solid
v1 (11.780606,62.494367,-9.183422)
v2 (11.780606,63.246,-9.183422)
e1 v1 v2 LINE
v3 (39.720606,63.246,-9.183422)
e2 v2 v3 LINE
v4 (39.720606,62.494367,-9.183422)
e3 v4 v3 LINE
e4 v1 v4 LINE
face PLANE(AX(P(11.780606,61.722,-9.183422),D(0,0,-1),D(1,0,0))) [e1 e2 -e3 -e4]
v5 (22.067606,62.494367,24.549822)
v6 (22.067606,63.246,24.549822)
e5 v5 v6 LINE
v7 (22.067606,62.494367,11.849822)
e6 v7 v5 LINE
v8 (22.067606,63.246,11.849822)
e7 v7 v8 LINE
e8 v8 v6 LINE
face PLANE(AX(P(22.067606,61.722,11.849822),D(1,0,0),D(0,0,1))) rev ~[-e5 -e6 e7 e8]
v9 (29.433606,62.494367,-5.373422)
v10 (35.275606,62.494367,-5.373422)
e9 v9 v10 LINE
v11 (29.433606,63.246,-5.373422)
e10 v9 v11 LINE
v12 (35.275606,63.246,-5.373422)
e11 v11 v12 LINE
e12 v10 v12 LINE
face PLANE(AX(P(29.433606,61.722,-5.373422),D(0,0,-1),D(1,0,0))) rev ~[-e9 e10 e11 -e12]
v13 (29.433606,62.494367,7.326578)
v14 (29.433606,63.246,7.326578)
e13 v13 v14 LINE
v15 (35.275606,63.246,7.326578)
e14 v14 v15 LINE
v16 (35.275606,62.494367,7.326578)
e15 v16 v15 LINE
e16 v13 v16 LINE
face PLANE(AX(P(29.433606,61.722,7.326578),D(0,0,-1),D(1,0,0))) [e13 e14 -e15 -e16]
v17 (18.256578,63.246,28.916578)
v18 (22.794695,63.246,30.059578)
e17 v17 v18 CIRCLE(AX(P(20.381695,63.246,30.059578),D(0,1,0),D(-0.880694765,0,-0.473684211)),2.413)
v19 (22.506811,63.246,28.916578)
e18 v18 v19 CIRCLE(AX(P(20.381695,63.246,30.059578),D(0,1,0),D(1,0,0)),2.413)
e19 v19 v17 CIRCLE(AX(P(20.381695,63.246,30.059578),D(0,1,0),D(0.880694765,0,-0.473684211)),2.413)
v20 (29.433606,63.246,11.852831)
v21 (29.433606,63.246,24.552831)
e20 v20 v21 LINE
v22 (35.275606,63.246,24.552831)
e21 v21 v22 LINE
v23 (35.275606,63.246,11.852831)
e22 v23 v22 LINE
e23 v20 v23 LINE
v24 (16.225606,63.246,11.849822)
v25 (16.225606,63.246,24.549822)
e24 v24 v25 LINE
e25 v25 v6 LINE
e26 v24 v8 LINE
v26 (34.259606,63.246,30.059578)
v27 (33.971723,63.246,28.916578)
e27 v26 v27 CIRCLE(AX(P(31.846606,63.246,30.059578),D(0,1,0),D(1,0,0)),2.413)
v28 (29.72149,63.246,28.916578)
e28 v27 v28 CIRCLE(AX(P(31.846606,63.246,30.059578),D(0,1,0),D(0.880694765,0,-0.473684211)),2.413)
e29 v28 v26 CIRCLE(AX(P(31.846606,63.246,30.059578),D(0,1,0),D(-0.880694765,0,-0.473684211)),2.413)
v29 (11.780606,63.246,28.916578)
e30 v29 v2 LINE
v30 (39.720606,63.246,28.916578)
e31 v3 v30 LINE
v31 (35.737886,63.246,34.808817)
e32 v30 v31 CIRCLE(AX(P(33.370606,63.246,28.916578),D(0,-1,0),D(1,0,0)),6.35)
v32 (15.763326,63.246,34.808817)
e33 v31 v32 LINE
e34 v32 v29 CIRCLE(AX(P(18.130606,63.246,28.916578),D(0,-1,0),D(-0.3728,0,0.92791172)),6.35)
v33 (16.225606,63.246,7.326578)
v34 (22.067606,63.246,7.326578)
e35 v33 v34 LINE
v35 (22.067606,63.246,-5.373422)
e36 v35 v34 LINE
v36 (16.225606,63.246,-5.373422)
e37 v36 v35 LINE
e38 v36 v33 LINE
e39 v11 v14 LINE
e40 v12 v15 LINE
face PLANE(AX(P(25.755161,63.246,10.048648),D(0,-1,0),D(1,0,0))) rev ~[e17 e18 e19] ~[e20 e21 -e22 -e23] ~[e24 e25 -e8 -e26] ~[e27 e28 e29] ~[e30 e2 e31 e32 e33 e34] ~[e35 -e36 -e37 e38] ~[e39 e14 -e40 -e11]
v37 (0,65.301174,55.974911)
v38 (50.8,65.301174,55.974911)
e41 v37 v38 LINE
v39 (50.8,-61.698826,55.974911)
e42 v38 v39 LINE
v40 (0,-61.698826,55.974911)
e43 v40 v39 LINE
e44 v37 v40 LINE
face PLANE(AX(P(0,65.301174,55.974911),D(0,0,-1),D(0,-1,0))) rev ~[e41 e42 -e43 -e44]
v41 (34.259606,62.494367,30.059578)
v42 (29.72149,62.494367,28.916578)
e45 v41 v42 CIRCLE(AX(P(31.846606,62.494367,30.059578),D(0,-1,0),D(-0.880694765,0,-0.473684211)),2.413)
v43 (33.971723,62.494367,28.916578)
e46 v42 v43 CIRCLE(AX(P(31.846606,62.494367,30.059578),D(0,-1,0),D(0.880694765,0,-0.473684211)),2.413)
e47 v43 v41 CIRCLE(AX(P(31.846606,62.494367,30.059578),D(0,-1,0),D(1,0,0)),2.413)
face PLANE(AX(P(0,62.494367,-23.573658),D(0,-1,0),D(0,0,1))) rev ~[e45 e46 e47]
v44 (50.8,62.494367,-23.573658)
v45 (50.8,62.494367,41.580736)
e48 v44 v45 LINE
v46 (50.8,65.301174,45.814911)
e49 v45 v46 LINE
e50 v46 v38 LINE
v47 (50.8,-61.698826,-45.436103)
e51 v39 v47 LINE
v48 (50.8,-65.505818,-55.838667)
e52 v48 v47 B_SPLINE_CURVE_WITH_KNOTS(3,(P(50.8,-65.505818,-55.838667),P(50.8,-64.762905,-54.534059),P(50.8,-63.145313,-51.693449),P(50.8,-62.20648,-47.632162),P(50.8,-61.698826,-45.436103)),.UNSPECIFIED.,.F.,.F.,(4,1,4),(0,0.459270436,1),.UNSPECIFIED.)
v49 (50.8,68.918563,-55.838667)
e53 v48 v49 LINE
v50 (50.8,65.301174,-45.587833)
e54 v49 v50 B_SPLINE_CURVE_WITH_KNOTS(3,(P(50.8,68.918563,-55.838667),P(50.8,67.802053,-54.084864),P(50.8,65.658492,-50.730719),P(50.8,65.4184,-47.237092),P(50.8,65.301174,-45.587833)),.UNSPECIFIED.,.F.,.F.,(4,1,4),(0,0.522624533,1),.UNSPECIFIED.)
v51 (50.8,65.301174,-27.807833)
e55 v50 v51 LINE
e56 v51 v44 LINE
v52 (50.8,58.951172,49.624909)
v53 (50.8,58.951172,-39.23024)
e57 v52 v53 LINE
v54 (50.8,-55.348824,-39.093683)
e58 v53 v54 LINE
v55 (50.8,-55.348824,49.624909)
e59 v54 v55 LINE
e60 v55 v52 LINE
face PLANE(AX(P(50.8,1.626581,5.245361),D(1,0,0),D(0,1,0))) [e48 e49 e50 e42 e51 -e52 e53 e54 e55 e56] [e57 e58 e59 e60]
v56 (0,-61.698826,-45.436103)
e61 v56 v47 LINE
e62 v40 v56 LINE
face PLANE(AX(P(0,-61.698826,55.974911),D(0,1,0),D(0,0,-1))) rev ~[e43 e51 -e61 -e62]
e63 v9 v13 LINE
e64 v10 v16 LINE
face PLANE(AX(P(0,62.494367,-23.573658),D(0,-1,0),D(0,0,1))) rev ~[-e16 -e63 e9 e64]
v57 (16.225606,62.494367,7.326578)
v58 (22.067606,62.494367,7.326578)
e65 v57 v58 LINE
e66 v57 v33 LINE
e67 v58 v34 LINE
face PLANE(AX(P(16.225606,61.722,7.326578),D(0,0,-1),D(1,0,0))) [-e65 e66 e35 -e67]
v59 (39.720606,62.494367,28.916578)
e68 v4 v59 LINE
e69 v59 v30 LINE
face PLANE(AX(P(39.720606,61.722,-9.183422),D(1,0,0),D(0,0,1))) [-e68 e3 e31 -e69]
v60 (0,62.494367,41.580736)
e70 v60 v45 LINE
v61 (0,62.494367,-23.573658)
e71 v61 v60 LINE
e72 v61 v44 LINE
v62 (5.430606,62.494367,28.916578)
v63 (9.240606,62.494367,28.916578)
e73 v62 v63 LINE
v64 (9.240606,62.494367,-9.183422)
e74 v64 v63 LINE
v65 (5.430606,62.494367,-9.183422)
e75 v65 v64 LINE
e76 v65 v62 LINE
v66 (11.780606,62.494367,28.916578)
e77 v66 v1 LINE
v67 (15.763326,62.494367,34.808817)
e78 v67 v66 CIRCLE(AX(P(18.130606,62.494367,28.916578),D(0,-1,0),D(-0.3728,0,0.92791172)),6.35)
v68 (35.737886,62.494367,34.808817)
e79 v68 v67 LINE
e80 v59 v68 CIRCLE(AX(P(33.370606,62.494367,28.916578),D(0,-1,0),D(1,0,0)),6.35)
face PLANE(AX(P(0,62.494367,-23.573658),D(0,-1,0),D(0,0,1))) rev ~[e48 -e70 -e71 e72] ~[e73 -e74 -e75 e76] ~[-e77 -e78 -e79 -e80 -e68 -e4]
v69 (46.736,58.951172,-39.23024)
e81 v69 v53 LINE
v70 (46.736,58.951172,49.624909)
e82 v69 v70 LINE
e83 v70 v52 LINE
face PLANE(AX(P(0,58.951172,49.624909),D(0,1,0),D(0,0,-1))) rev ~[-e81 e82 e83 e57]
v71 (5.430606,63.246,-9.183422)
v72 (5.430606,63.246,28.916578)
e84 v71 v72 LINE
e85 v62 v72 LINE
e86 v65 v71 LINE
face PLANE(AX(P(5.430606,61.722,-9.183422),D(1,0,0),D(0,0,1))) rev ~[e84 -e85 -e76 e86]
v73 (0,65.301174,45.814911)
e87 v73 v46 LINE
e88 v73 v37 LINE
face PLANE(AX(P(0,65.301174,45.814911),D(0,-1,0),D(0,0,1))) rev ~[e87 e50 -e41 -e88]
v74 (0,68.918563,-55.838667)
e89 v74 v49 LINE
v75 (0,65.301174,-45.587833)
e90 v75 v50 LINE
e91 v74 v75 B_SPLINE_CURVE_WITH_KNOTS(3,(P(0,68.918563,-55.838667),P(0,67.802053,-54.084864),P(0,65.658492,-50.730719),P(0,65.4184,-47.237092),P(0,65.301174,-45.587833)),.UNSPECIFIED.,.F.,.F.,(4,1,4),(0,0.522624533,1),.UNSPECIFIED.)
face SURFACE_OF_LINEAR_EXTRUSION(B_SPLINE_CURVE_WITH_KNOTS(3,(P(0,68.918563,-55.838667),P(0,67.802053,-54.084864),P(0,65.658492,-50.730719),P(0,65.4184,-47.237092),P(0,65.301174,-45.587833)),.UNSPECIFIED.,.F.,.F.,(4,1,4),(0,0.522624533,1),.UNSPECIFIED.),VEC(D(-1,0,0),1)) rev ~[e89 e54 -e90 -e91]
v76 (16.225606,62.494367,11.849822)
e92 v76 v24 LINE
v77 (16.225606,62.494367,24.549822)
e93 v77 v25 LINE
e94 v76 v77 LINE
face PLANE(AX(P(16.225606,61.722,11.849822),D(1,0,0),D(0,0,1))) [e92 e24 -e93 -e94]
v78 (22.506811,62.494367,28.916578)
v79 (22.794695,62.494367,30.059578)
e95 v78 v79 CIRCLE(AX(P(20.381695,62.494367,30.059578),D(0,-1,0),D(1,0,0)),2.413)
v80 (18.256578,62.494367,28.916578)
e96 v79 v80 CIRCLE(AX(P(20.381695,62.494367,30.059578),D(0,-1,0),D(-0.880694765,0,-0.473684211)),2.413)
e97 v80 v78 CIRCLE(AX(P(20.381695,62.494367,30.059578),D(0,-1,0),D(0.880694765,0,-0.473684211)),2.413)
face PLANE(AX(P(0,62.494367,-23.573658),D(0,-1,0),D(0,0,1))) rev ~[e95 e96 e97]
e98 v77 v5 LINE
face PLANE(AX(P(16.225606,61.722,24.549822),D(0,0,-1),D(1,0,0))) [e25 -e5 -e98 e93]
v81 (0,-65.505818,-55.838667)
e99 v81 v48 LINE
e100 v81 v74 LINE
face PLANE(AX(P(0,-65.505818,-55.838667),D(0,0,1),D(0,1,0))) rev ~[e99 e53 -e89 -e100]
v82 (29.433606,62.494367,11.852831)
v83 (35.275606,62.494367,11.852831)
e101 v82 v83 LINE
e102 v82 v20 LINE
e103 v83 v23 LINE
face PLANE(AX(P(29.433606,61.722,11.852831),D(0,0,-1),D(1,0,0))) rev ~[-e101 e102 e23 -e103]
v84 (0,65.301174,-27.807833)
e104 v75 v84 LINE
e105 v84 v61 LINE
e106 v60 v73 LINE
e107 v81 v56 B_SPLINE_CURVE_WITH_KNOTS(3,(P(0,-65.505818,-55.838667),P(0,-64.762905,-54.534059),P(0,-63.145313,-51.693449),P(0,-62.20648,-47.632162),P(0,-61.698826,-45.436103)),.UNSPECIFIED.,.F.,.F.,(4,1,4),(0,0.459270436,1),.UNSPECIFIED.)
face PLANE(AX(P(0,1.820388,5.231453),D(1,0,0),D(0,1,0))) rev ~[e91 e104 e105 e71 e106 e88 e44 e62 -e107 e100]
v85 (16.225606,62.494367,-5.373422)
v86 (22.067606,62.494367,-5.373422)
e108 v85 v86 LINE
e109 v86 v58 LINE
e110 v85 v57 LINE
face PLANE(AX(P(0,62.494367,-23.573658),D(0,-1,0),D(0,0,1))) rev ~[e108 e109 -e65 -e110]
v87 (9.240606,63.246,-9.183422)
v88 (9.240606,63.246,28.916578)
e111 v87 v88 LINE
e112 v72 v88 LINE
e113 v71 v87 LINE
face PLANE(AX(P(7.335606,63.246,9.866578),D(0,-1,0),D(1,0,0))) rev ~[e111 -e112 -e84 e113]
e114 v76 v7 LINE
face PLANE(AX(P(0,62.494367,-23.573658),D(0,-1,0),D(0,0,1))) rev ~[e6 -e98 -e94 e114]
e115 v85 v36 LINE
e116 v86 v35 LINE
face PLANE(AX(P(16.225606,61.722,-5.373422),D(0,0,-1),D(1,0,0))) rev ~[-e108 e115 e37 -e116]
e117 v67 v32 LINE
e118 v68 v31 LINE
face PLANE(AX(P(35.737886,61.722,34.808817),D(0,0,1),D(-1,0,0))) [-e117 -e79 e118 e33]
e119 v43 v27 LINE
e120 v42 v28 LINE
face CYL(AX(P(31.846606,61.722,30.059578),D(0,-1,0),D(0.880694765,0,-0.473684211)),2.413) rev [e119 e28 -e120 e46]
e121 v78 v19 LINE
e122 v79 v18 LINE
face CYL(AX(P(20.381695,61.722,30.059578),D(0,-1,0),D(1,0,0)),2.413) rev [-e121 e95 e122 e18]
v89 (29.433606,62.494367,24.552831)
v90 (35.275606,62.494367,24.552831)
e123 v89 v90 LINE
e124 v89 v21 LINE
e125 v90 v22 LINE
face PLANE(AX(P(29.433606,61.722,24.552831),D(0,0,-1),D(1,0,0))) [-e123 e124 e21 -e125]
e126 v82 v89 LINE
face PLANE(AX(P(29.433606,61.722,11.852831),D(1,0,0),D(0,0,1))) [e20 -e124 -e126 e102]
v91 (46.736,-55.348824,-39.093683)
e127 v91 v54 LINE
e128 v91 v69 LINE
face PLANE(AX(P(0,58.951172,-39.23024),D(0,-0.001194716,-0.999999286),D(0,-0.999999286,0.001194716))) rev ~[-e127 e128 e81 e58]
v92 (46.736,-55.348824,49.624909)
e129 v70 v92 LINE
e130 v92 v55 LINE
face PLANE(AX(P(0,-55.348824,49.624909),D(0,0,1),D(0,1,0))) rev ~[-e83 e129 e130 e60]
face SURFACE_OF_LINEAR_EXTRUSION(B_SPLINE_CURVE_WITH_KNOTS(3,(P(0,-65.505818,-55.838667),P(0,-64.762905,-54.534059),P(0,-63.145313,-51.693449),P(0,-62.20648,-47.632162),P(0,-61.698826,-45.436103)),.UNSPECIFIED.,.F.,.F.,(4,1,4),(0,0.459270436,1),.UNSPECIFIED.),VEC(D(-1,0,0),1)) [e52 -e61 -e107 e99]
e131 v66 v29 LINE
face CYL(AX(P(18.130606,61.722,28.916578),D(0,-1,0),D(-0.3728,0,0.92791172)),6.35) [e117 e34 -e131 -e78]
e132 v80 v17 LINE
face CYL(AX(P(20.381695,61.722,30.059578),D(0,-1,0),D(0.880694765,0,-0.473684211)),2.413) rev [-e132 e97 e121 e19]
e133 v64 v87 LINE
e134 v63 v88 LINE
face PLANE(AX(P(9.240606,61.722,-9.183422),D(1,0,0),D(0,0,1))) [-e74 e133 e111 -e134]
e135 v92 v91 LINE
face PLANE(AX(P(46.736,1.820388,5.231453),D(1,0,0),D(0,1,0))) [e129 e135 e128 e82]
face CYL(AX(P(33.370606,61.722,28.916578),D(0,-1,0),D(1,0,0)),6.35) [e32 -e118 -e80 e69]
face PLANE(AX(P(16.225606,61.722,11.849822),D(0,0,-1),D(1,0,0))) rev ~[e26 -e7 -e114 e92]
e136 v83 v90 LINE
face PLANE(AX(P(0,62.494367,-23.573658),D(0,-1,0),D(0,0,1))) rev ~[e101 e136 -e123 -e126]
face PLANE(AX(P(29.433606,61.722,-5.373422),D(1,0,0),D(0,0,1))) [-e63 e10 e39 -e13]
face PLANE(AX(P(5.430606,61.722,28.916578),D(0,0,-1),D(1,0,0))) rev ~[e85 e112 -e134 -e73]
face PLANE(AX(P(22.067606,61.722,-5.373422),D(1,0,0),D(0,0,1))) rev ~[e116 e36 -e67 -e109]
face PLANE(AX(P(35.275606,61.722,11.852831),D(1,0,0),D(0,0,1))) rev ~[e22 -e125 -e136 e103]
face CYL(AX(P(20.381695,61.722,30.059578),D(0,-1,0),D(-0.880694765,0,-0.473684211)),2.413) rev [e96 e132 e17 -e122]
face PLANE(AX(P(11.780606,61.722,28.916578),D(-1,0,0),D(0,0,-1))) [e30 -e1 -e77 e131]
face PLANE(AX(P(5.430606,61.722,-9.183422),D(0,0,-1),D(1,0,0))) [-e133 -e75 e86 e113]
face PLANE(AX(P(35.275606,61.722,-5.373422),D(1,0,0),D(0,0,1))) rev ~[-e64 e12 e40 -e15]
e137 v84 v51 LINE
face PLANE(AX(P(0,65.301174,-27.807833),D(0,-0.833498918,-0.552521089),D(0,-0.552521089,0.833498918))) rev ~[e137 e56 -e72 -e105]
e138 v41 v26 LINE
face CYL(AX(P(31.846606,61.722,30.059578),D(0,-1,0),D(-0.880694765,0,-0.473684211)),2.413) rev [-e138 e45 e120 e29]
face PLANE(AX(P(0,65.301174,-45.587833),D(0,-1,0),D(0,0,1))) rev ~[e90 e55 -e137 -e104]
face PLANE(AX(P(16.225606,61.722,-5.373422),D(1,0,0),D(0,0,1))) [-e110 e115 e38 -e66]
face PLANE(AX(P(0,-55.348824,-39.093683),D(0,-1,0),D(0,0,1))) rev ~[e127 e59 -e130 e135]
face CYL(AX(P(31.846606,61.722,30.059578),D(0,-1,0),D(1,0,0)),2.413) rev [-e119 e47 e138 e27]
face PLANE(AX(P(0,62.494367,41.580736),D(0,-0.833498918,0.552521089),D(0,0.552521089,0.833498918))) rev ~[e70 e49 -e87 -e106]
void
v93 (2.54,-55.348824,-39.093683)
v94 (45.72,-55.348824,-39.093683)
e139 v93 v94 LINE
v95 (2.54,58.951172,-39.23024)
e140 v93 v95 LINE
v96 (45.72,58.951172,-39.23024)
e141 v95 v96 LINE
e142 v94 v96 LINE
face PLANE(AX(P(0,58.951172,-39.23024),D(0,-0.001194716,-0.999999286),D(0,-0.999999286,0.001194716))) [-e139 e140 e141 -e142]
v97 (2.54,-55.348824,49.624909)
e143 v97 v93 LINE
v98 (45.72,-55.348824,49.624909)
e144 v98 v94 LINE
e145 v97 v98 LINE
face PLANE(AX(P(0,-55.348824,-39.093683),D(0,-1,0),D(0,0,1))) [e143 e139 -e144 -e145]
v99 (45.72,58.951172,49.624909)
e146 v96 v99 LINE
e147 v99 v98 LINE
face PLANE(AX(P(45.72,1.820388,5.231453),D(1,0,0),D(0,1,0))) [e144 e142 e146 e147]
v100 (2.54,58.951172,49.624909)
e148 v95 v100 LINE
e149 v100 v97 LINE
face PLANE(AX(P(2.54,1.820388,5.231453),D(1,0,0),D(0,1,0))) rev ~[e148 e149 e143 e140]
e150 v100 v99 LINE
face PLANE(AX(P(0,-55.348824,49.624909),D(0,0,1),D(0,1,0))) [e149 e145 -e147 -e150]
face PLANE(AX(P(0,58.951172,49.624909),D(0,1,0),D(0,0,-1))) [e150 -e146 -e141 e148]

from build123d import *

# Parameters (mm, degrees)
F1_DEPTH = 50.8
F2_DEPTH = 2.54
F5_START = 43.18
F5_DEPTH = 1.016
F6_START = -61.722
F4_W     = 5.842
F4_H     = 12.7
F4_W_2   = 3.81
F4_H_2   = 38.1
F6_DEPTH = 1.524


# Not quite as in the source:
# - a feature of the source that left no trace in its solid (it failed there, or was rolled back) is left out


with BuildPart() as f1:
    # F0 (on Right) → F1 (new body)
    with BuildSketch(Plane.YZ):
        Polygon((-61.698825866, 55.9749106665), (-61.698825866, -45.4361034706), (65.301174134, -45.5878325482), (65.301174134, -27.8078325482), (62.494367, -23.5736580464), (62.494367, 41.5807361647), (65.301174134, 45.8149106665), (65.301174134, 55.9749106665), align=None)
        Polygon((-55.3488239149, -39.093683444), (-55.3488239149, 49.6249087155), (58.951172183, 49.6249087155), (58.951172183, -39.2302396091), align=None, mode=Mode.SUBTRACT)
        with BuildLine():
            Line((65.301174134, -45.5878325482), (-61.698825866, -45.4361034706))
            add(Edge.make_bspline(
                [(-65.5058175325, -55.8386668563), (-64.7629052579, -54.5340589091), (-63.1453130575, -51.6934494428), (-62.2064804259, -47.6321617795), (-61.698825866, -45.4361034706)],
                knots=[0, 0, 0, 0, 0.4592704357, 1, 1, 1, 1], degree=3))
            Line((-65.5058175325, -55.8386668563), (68.9185634255, -55.8386668563))
            add(Edge.make_bspline(
                [(68.9185634255, -55.8386668563), (67.8020531364, -54.0848642317), (65.6584922314, -50.7307193347), (65.4183999928, -47.2370915893), (65.301174134, -45.5878325482)],
                knots=[0, 0, 0, 0, 0.5226245331, 1, 1, 1, 1], degree=3))
        make_face()
    extrude(amount=F1_DEPTH)

    # F0 (on Right) → F2 (join)
    with BuildSketch(Plane.YZ):
        Polygon((58.951172183, 49.6249087155), (-55.3488239149, 49.6249087155), (-55.3488239149, -39.093683444), (58.951172183, -39.2302396091), align=None)
    extrude(amount=F2_DEPTH)

    # F2_face (on face) → F5 (join)
    with BuildSketch(Plane(origin=(2.54, 1.8158237937, 5.2314648434), x_dir=(0, 1, 0), z_dir=(1, 0, 0)).offset(F5_START)):
        Polygon((57.1353483893, -44.4617044525), (57.1353483893, 44.3934438721), (-57.1646477086, 44.3934438721), (-57.1646477086, -44.3251482873), align=None)
    extrude(amount=F5_DEPTH)

    # F4 (on Front) → F6 (join)
    with BuildSketch(Plane.XZ.offset(F6_START)):
        with BuildLine():
            Line((39.7206060588, -9.1834223449), (39.7206060588, 28.9165776551))
            Line((39.7206060588, 28.9165776551), (33.9717225262, 28.9165776551))
            ThreePointArc((33.9717225262, 28.9165776551), (31.8466060588, 27.6465776551), (29.7214895914, 28.9165776551))
            Line((29.7214895914, 28.9165776551), (22.506811127, 28.9165776551))
            ThreePointArc((22.506811127, 28.9165776551), (20.3816946596, 27.6465776551), (18.2565781922, 28.9165776551))
            Line((18.2565781922, 28.9165776551), (11.7806060588, 28.9165776551))
            Line((11.7806060588, 28.9165776551), (11.7806060588, -9.1834223449))
            Line((11.7806060588, -9.1834223449), (39.7206060588, -9.1834223449))
        make_face()
        with Locations((19.1466060588, 0.9765776551)):
            Rectangle(F4_W, F4_H, mode=Mode.SUBTRACT)
        with Locations((32.3546060588, 0.9765776551)):
            Rectangle(F4_W, F4_H, mode=Mode.SUBTRACT)
        with Locations((19.1466060588, 18.1998224765)):
            Rectangle(F4_W, F4_H, mode=Mode.SUBTRACT)
        with Locations((32.3546060588, 18.2028314263)):
            Rectangle(F4_W, F4_H, mode=Mode.SUBTRACT)
        with BuildLine():
            Line((33.9717225262, 28.9165776551), (39.7206060588, 28.9165776551))
            ThreePointArc((39.7206060588, 28.9165776551), (38.6315341138, 32.4725776551), (35.7378860588, 34.8088170767))
            Line((35.7378860588, 34.8088170767), (15.7633260588, 34.8088170767))
            ThreePointArc((15.7633260588, 34.8088170767), (12.8696780038, 32.4725776551), (11.7806060588, 28.9165776551))
            Line((11.7806060588, 28.9165776551), (18.2565781922, 28.9165776551))
            ThreePointArc((18.2565781922, 28.9165776551), (19.7923463058, 32.3995002004), (22.7946946596, 30.0595776551))
            ThreePointArc((22.7946946596, 30.0595776551), (22.7216172049, 29.4702293013), (22.506811127, 28.9165776551))
            Line((22.506811127, 28.9165776551), (29.7214895914, 28.9165776551))
            ThreePointArc((29.7214895914, 28.9165776551), (31.2572577051, 32.3995002004), (34.2596060588, 30.0595776551))
            ThreePointArc((34.2596060588, 30.0595776551), (34.1865286041, 29.4702293013), (33.9717225262, 28.9165776551))
        make_face()
        with Locations((7.3356060588, 9.8665776551)):
            Rectangle(F4_W_2, F4_H_2)
    extrude(amount=-F6_DEPTH)


solid = f1.part
